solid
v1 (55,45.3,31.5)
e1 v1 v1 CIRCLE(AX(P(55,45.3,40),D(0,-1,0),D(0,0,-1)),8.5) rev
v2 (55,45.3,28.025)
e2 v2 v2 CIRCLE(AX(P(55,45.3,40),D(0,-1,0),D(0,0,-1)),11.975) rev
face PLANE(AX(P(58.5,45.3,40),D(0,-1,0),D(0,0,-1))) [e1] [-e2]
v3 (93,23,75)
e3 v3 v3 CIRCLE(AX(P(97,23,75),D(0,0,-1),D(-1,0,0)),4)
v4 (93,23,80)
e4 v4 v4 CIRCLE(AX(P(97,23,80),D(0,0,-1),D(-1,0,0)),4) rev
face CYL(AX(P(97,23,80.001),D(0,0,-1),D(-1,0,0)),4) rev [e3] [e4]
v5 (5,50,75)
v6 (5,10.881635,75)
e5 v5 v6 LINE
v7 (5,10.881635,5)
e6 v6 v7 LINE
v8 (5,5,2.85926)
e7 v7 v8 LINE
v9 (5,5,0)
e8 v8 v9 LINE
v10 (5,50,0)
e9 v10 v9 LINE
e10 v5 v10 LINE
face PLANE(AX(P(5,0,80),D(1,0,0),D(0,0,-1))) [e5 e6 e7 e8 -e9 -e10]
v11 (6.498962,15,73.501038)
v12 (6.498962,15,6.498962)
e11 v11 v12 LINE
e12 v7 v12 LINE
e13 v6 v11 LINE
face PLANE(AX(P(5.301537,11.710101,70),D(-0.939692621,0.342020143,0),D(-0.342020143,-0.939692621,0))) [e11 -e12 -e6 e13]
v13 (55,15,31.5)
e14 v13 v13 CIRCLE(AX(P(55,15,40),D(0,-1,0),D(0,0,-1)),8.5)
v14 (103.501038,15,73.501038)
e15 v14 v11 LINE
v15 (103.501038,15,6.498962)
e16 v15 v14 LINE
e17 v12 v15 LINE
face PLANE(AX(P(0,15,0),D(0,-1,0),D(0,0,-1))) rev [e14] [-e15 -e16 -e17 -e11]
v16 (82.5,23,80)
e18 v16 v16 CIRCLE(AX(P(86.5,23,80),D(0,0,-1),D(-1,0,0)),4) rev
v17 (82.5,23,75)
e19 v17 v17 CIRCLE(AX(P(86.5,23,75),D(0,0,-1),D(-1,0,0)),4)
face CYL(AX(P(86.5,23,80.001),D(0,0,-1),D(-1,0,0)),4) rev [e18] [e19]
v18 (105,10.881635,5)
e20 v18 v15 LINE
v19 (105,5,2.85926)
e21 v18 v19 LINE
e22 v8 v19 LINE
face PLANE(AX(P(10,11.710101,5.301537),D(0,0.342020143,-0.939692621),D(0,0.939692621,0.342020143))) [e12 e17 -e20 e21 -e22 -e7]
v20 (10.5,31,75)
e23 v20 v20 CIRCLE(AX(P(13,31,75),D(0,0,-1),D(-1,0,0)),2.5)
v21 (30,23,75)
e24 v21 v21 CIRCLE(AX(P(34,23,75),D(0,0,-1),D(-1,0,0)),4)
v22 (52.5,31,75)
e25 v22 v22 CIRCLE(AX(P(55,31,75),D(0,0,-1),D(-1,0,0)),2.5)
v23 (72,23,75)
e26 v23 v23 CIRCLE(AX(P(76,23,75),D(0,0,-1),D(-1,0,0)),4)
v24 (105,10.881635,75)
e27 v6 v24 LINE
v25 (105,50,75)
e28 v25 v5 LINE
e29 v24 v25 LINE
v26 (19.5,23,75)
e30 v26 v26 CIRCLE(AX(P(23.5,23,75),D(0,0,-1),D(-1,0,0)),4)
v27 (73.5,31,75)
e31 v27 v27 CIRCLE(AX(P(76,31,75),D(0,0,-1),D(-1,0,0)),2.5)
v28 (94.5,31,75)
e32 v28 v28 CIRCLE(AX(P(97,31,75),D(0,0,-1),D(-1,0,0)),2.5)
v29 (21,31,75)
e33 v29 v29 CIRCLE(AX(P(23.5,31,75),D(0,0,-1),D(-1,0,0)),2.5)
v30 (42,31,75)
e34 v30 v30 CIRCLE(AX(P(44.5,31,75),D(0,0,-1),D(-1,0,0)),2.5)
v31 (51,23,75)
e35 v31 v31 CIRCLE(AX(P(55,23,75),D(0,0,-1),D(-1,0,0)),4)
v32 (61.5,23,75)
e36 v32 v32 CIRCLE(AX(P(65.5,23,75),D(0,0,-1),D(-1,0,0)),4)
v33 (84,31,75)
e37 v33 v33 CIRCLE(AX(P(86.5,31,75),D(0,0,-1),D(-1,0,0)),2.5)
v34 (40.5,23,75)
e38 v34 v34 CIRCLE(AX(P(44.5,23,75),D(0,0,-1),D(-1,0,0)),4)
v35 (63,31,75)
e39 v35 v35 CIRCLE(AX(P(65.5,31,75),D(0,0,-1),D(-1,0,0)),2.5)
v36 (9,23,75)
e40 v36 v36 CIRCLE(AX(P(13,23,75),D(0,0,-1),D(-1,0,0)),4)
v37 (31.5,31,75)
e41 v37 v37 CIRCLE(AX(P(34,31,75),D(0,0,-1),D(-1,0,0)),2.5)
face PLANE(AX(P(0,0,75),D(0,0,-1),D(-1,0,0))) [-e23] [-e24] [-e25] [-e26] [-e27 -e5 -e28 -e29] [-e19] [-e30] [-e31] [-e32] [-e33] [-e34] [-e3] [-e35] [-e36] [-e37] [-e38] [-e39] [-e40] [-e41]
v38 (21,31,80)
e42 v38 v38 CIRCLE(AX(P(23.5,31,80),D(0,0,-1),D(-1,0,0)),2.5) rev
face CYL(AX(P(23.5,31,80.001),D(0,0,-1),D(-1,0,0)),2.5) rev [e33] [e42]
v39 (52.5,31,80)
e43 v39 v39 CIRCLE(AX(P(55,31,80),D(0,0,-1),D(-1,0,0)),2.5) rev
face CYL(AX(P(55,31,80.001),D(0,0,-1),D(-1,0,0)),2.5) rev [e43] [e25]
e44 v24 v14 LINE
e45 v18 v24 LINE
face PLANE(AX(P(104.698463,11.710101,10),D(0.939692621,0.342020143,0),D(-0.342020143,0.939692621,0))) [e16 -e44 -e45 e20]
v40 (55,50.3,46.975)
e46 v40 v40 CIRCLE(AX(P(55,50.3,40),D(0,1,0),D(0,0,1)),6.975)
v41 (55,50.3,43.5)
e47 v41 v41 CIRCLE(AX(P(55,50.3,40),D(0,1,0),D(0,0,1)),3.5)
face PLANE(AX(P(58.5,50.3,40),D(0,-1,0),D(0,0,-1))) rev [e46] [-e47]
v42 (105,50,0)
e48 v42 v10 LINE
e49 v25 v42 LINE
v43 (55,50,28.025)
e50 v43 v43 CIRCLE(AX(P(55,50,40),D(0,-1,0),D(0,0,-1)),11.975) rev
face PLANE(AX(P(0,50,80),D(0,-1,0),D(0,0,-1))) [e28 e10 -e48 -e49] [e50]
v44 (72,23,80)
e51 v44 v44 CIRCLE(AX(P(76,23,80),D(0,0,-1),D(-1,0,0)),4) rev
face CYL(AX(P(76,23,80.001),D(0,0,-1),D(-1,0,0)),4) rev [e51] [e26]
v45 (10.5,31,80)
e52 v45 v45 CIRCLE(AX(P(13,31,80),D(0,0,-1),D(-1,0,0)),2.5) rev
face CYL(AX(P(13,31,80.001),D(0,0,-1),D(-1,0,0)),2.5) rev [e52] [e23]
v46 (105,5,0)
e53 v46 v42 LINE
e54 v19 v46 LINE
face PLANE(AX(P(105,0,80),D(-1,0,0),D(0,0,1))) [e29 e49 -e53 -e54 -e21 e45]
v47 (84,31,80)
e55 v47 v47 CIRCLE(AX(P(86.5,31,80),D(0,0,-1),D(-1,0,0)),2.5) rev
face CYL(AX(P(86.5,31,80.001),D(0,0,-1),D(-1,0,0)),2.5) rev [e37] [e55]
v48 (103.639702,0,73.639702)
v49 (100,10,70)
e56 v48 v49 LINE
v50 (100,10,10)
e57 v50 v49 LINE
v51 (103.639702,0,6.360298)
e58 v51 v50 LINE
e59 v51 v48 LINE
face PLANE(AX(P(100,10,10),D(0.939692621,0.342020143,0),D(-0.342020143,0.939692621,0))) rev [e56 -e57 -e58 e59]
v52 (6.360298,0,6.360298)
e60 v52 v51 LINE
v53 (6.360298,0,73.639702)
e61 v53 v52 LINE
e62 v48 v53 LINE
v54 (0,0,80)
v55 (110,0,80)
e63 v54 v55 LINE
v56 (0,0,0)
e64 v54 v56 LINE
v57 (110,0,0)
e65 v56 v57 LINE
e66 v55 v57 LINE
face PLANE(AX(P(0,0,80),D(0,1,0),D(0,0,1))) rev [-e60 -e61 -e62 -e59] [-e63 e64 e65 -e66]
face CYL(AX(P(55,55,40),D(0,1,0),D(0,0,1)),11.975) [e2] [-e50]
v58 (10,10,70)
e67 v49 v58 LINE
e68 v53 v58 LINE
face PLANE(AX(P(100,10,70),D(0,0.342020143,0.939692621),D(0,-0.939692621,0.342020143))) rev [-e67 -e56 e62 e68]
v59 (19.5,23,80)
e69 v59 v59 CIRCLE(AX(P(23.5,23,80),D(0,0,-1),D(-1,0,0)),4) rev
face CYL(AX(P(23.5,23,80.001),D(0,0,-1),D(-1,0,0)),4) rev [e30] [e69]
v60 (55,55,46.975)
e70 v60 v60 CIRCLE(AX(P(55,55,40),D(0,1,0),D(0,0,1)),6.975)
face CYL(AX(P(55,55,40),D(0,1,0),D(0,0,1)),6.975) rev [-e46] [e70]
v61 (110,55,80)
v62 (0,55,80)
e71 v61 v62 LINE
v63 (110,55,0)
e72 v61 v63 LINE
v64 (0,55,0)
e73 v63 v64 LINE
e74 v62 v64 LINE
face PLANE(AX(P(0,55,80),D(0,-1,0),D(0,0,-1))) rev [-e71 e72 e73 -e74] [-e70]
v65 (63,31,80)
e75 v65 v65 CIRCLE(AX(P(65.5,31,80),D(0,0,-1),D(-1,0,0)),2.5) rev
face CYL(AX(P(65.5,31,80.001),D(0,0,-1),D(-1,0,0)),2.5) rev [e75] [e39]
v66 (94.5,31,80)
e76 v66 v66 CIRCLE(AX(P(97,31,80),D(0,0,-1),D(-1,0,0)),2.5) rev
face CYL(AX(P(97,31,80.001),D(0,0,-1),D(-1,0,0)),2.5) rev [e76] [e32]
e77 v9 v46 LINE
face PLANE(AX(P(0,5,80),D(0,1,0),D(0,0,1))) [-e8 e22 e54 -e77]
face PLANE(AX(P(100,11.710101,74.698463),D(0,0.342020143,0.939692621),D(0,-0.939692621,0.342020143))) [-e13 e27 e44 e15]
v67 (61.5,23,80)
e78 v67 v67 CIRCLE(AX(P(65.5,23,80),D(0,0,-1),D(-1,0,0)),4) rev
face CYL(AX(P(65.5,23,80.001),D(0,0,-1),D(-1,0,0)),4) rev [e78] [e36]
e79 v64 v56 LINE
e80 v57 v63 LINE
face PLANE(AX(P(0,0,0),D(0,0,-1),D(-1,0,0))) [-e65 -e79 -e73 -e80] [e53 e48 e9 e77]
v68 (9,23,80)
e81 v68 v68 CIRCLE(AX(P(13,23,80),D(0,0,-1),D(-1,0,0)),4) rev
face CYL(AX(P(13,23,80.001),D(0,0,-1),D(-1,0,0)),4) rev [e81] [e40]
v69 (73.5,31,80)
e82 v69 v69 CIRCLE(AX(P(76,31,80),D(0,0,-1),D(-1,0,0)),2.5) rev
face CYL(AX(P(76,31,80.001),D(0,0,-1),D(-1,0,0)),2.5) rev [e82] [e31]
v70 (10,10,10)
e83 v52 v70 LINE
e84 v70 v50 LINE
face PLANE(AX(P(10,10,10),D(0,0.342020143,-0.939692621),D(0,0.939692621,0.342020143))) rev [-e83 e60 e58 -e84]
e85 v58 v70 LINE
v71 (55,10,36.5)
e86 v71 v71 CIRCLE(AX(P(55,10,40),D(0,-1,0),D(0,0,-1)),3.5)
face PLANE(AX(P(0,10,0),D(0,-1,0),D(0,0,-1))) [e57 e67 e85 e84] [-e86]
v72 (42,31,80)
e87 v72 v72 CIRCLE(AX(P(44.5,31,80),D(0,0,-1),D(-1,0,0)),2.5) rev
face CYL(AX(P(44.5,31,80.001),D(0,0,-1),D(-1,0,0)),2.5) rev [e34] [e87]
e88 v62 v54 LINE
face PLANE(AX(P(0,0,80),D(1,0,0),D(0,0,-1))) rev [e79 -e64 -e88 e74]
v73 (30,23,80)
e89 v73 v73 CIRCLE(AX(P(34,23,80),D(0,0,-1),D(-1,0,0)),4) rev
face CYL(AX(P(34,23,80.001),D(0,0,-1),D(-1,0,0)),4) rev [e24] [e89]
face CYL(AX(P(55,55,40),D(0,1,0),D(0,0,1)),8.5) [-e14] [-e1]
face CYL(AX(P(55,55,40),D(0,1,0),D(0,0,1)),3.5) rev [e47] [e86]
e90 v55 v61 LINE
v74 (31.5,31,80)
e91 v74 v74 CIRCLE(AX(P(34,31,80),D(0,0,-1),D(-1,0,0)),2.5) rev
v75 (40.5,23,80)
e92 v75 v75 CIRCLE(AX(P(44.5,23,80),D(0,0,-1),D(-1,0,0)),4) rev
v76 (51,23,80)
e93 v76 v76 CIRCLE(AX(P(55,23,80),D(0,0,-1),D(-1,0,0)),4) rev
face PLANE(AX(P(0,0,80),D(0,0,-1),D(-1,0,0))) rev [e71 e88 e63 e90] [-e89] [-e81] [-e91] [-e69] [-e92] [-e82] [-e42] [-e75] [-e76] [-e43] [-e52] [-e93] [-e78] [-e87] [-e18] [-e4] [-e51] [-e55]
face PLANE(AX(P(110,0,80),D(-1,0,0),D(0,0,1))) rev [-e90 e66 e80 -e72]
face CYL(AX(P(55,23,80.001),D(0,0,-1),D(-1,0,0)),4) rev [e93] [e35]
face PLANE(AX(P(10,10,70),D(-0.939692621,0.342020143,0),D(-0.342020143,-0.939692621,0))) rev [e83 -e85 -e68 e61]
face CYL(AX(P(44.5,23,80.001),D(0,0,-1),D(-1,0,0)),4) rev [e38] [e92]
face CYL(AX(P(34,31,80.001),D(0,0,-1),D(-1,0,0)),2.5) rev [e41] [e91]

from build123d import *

# Parameters (mm, degrees)
SKETCH2_W                                        = 110
SKETCH2_H                                        = 55
BOSS_EXTRUDE1_DEPTH                              = 80
SKETCH4_W                                        = 90
SKETCH4_H                                        = 60
CUT_EXTRUDE2_DEPTH                               = 10
CUT_EXTRUDE2_DRAFT                               = -20
CBORE_FOR_M6_HEX_HEAD_MACHINE_SCREW1_D           = 7
CBORE_FOR_M6_HEX_HEAD_MACHINE_SCREW1_CBORE_D     = 13.95
CBORE_FOR_M6_HEX_HEAD_MACHINE_SCREW1_CBORE_DEPTH = 4.7
SHELL4_START                                     = 15
SHELL4_OUTLINE_W                                 = 100
SHELL4_OUTLINE_H                                 = 75
SHELL4_OUTLINE_R                                 = 11.975
SHELL4_DEPTH                                     = 35
SHELL4_2_OUTLINE_R                               = 11.975
SHELL4_2_OUTLINE_R_2                             = 8.5
SHELL4_2_DEPTH                                   = 30.3
SHELL4_3_OUTLINE_W                               = 100
SHELL4_3_OUTLINE_H                               = 10
SHELL4_3_DEPTH                                   = 2.859259966
SHELL4_4_DEPTH                                   = 75
SHELL4_START_2                                   = 5
SHELL4_5_DEPTH                                   = 100
CUT_EXTRUDE4_REACH                               = 146.049
SKETCH8_R                                        = 2.5
SKETCH8_R_2                                      = 4


with BuildPart() as part:
    # Sketch2 → Boss-Extrude1 (new body)
    with BuildSketch(Plane.XY):
        with Locations((55, 27.5)):
            Rectangle(SKETCH2_W, SKETCH2_H)
    extrude(amount=BOSS_EXTRUDE1_DEPTH)


with BuildPart() as cut_extrude2_tool:
    # Sketch4 → Cut-Extrude2 (with draft: the straight prism first)
    with BuildSketch(Plane(origin=(0, 10, 0), x_dir=(-1, 0, 0), z_dir=(0, -1, 0))):
        with Locations((-55, -40)):
            Rectangle(SKETCH4_W, SKETCH4_H)
    extrude(amount=CUT_EXTRUDE2_DEPTH)
    # Cut-Extrude2: the draft: its side faces are tilted about the plane it starts from
    cut_extrude2_sides = [cut_extrude2_tool.faces().sort_by_distance(p)[0] for p in [
        (55, 5, 70),
        (10, 5, 40),
        (55, 5, 10),
        (100, 5, 40),
    ]]
    draft(cut_extrude2_sides, Plane(origin=(0, 10, 0), x_dir=(-1, 0, 0), z_dir=(0, -1, 0)), CUT_EXTRUDE2_DRAFT)


with BuildPart() as part_1:
    add(part.part)

    # Cut-Extrude2: cut by cut_extrude2_tool
    add(cut_extrude2_tool.part, mode=Mode.SUBTRACT)

    # CBORE for M6 Hex Head Machine Screw1 (through all)
    with Locations(Plane(origin=(0, 55, 0), x_dir=(1, 0, 0), z_dir=(0, 1, 0))):
        with Locations((55, -40)):
            CounterBoreHole(CBORE_FOR_M6_HEX_HEAD_MACHINE_SCREW1_D / 2, CBORE_FOR_M6_HEX_HEAD_MACHINE_SCREW1_CBORE_D / 2, CBORE_FOR_M6_HEX_HEAD_MACHINE_SCREW1_CBORE_DEPTH)

    # Shell4: read off the stored shape, not the designer's step
    # Shell4 outline → Shell4 (cut)
    with BuildSketch(Plane(origin=(0, 0, 0), x_dir=(1, 0, 0), z_dir=(0, 1, 0)).offset(SHELL4_START)):
        with Locations((55, -37.5)):
            Rectangle(SHELL4_OUTLINE_W, SHELL4_OUTLINE_H)
        with Locations((55, -40)):
            Circle(SHELL4_OUTLINE_R, mode=Mode.SUBTRACT)
    extrude(amount=SHELL4_DEPTH, mode=Mode.SUBTRACT)

    # Shell4 2 outline → Shell4 2 (cut)
    with BuildSketch(Plane(origin=(0, 0, 0), x_dir=(1, 0, 0), z_dir=(0, 1, 0)).offset(SHELL4_START)):
        with Locations((55, -40)):
            Circle(SHELL4_2_OUTLINE_R)
        with Locations((55, -40)):
            Circle(SHELL4_2_OUTLINE_R_2, mode=Mode.SUBTRACT)
    extrude(amount=SHELL4_2_DEPTH, mode=Mode.SUBTRACT)

    # Shell4 3 outline → Shell4 3 (cut)
    with BuildSketch(Plane.XY):
        with Locations((55, 10)):
            Rectangle(SHELL4_3_OUTLINE_W, SHELL4_3_OUTLINE_H)
    extrude(amount=SHELL4_3_DEPTH, mode=Mode.SUBTRACT)

    # Shell4 4 outline → Shell4 4 (cut)
    with BuildSketch(Plane.XY):
        Polygon((103.501037691, 15), (105, 10.881634904), (105, 15), align=None)
        Polygon((5, 15), (5, 10.881634904), (6.498962309, 15), align=None)
    extrude(amount=SHELL4_4_DEPTH, mode=Mode.SUBTRACT)

    # Shell4 5 outline → Shell4 5 (cut)
    with BuildSketch(Plane.YZ.offset(SHELL4_START_2)):
        Polygon((15, 2.859259966), (15, 6.498962309), (5, 2.859259966), align=None)
        Polygon((15, 75), (10.881634904, 75), (15, 73.501037691), align=None)
    extrude(amount=SHELL4_5_DEPTH, mode=Mode.SUBTRACT)

    # Sketch8 → Cut-Extrude4 (cut, up to next)
    with BuildSketch(Plane(origin=(0, 0, 75), x_dir=(-1, 0, 0), z_dir=(0, 0, -1)), mode=Mode.PRIVATE) as cut_extrude4_sk1:
        with Locations((-97, 31)):
            Circle(SKETCH8_R)
    cut_extrude4_tool1 = extrude(cut_extrude4_sk1.sketch, amount=-CUT_EXTRUDE4_REACH, mode=Mode.PRIVATE) & part_1.part
    # Sketch8 → Cut-Extrude4 (cut, up to next)
    with BuildSketch(Plane(origin=(0, 0, 75), x_dir=(-1, 0, 0), z_dir=(0, 0, -1)), mode=Mode.PRIVATE) as cut_extrude4_sk2:
        with Locations((-97, 23)):
            Circle(SKETCH8_R_2)
    cut_extrude4_tool2 = extrude(cut_extrude4_sk2.sketch, amount=-CUT_EXTRUDE4_REACH, mode=Mode.PRIVATE) & part_1.part
    # Sketch8 → Cut-Extrude4 (cut, up to next)
    with BuildSketch(Plane(origin=(0, 0, 75), x_dir=(-1, 0, 0), z_dir=(0, 0, -1)), mode=Mode.PRIVATE) as cut_extrude4_sk3:
        with Locations((-86.5, 31)):
            Circle(SKETCH8_R)
    cut_extrude4_tool3 = extrude(cut_extrude4_sk3.sketch, amount=-CUT_EXTRUDE4_REACH, mode=Mode.PRIVATE) & part_1.part
    # Sketch8 → Cut-Extrude4 (cut, up to next)
    with BuildSketch(Plane(origin=(0, 0, 75), x_dir=(-1, 0, 0), z_dir=(0, 0, -1)), mode=Mode.PRIVATE) as cut_extrude4_sk4:
        with Locations((-86.5, 23)):
            Circle(SKETCH8_R_2)
    cut_extrude4_tool4 = extrude(cut_extrude4_sk4.sketch, amount=-CUT_EXTRUDE4_REACH, mode=Mode.PRIVATE) & part_1.part
    # Sketch8 → Cut-Extrude4 (cut, up to next)
    with BuildSketch(Plane(origin=(0, 0, 75), x_dir=(-1, 0, 0), z_dir=(0, 0, -1)), mode=Mode.PRIVATE) as cut_extrude4_sk5:
        with Locations((-76, 31)):
            Circle(SKETCH8_R)
    cut_extrude4_tool5 = extrude(cut_extrude4_sk5.sketch, amount=-CUT_EXTRUDE4_REACH, mode=Mode.PRIVATE) & part_1.part
    # Sketch8 → Cut-Extrude4 (cut, up to next)
    with BuildSketch(Plane(origin=(0, 0, 75), x_dir=(-1, 0, 0), z_dir=(0, 0, -1)), mode=Mode.PRIVATE) as cut_extrude4_sk6:
        with Locations((-76, 23)):
            Circle(SKETCH8_R_2)
    cut_extrude4_tool6 = extrude(cut_extrude4_sk6.sketch, amount=-CUT_EXTRUDE4_REACH, mode=Mode.PRIVATE) & part_1.part
    # Sketch8 → Cut-Extrude4 (cut, up to next)
    with BuildSketch(Plane(origin=(0, 0, 75), x_dir=(-1, 0, 0), z_dir=(0, 0, -1)), mode=Mode.PRIVATE) as cut_extrude4_sk7:
        with Locations((-65.5, 31)):
            Circle(SKETCH8_R)
    cut_extrude4_tool7 = extrude(cut_extrude4_sk7.sketch, amount=-CUT_EXTRUDE4_REACH, mode=Mode.PRIVATE) & part_1.part
    # Sketch8 → Cut-Extrude4 (cut, up to next)
    with BuildSketch(Plane(origin=(0, 0, 75), x_dir=(-1, 0, 0), z_dir=(0, 0, -1)), mode=Mode.PRIVATE) as cut_extrude4_sk8:
        with Locations((-65.5, 23)):
            Circle(SKETCH8_R_2)
    cut_extrude4_tool8 = extrude(cut_extrude4_sk8.sketch, amount=-CUT_EXTRUDE4_REACH, mode=Mode.PRIVATE) & part_1.part
    # Sketch8 → Cut-Extrude4 (cut, up to next)
    with BuildSketch(Plane(origin=(0, 0, 75), x_dir=(-1, 0, 0), z_dir=(0, 0, -1)), mode=Mode.PRIVATE) as cut_extrude4_sk9:
        with Locations((-55, 31)):
            Circle(SKETCH8_R)
    cut_extrude4_tool9 = extrude(cut_extrude4_sk9.sketch, amount=-CUT_EXTRUDE4_REACH, mode=Mode.PRIVATE) & part_1.part
    # Sketch8 → Cut-Extrude4 (cut, up to next)
    with BuildSketch(Plane(origin=(0, 0, 75), x_dir=(-1, 0, 0), z_dir=(0, 0, -1)), mode=Mode.PRIVATE) as cut_extrude4_sk10:
        with Locations((-55, 23)):
            Circle(SKETCH8_R_2)
    cut_extrude4_tool10 = extrude(cut_extrude4_sk10.sketch, amount=-CUT_EXTRUDE4_REACH, mode=Mode.PRIVATE) & part_1.part
    # Sketch8 → Cut-Extrude4 (cut, up to next)
    with BuildSketch(Plane(origin=(0, 0, 75), x_dir=(-1, 0, 0), z_dir=(0, 0, -1)), mode=Mode.PRIVATE) as cut_extrude4_sk11:
        with Locations((-44.5, 31)):
            Circle(SKETCH8_R)
    cut_extrude4_tool11 = extrude(cut_extrude4_sk11.sketch, amount=-CUT_EXTRUDE4_REACH, mode=Mode.PRIVATE) & part_1.part
    # Sketch8 → Cut-Extrude4 (cut, up to next)
    with BuildSketch(Plane(origin=(0, 0, 75), x_dir=(-1, 0, 0), z_dir=(0, 0, -1)), mode=Mode.PRIVATE) as cut_extrude4_sk12:
        with Locations((-44.5, 23)):
            Circle(SKETCH8_R_2)
    cut_extrude4_tool12 = extrude(cut_extrude4_sk12.sketch, amount=-CUT_EXTRUDE4_REACH, mode=Mode.PRIVATE) & part_1.part
    # Sketch8 → Cut-Extrude4 (cut, up to next)
    with BuildSketch(Plane(origin=(0, 0, 75), x_dir=(-1, 0, 0), z_dir=(0, 0, -1)), mode=Mode.PRIVATE) as cut_extrude4_sk13:
        with Locations((-34, 31)):
            Circle(SKETCH8_R)
    cut_extrude4_tool13 = extrude(cut_extrude4_sk13.sketch, amount=-CUT_EXTRUDE4_REACH, mode=Mode.PRIVATE) & part_1.part
    # Sketch8 → Cut-Extrude4 (cut, up to next)
    with BuildSketch(Plane(origin=(0, 0, 75), x_dir=(-1, 0, 0), z_dir=(0, 0, -1)), mode=Mode.PRIVATE) as cut_extrude4_sk14:
        with Locations((-34, 23)):
            Circle(SKETCH8_R_2)
    cut_extrude4_tool14 = extrude(cut_extrude4_sk14.sketch, amount=-CUT_EXTRUDE4_REACH, mode=Mode.PRIVATE) & part_1.part
    # Sketch8 → Cut-Extrude4 (cut, up to next)
    with BuildSketch(Plane(origin=(0, 0, 75), x_dir=(-1, 0, 0), z_dir=(0, 0, -1)), mode=Mode.PRIVATE) as cut_extrude4_sk15:
        with Locations((-23.5, 31)):
            Circle(SKETCH8_R)
    cut_extrude4_tool15 = extrude(cut_extrude4_sk15.sketch, amount=-CUT_EXTRUDE4_REACH, mode=Mode.PRIVATE) & part_1.part
    # Sketch8 → Cut-Extrude4 (cut, up to next)
    with BuildSketch(Plane(origin=(0, 0, 75), x_dir=(-1, 0, 0), z_dir=(0, 0, -1)), mode=Mode.PRIVATE) as cut_extrude4_sk16:
        with Locations((-23.5, 23)):
            Circle(SKETCH8_R_2)
    cut_extrude4_tool16 = extrude(cut_extrude4_sk16.sketch, amount=-CUT_EXTRUDE4_REACH, mode=Mode.PRIVATE) & part_1.part
    # Sketch8 → Cut-Extrude4 (cut, up to next)
    with BuildSketch(Plane(origin=(0, 0, 75), x_dir=(-1, 0, 0), z_dir=(0, 0, -1)), mode=Mode.PRIVATE) as cut_extrude4_sk17:
        with Locations((-13, 31)):
            Circle(SKETCH8_R)
    cut_extrude4_tool17 = extrude(cut_extrude4_sk17.sketch, amount=-CUT_EXTRUDE4_REACH, mode=Mode.PRIVATE) & part_1.part
    # Sketch8 → Cut-Extrude4 (cut, up to next)
    with BuildSketch(Plane(origin=(0, 0, 75), x_dir=(-1, 0, 0), z_dir=(0, 0, -1)), mode=Mode.PRIVATE) as cut_extrude4_sk18:
        with Locations((-13, 23)):
            Circle(SKETCH8_R_2)
    cut_extrude4_tool18 = extrude(cut_extrude4_sk18.sketch, amount=-CUT_EXTRUDE4_REACH, mode=Mode.PRIVATE) & part_1.part
    add(cut_extrude4_tool1.solids().sort_by_distance((97, 31, 75))[0], mode=Mode.SUBTRACT)
    add(cut_extrude4_tool2.solids().sort_by_distance((97, 23, 75))[0], mode=Mode.SUBTRACT)
    add(cut_extrude4_tool3.solids().sort_by_distance((86.5, 31, 75))[0], mode=Mode.SUBTRACT)
    add(cut_extrude4_tool4.solids().sort_by_distance((86.5, 23, 75))[0], mode=Mode.SUBTRACT)
    add(cut_extrude4_tool5.solids().sort_by_distance((76, 31, 75))[0], mode=Mode.SUBTRACT)
    add(cut_extrude4_tool6.solids().sort_by_distance((76, 23, 75))[0], mode=Mode.SUBTRACT)
    add(cut_extrude4_tool7.solids().sort_by_distance((65.5, 31, 75))[0], mode=Mode.SUBTRACT)
    add(cut_extrude4_tool8.solids().sort_by_distance((65.5, 23, 75))[0], mode=Mode.SUBTRACT)
    add(cut_extrude4_tool9.solids().sort_by_distance((55, 31, 75))[0], mode=Mode.SUBTRACT)
    add(cut_extrude4_tool10.solids().sort_by_distance((55, 23, 75))[0], mode=Mode.SUBTRACT)
    add(cut_extrude4_tool11.solids().sort_by_distance((44.5, 31, 75))[0], mode=Mode.SUBTRACT)
    add(cut_extrude4_tool12.solids().sort_by_distance((44.5, 23, 75))[0], mode=Mode.SUBTRACT)
    add(cut_extrude4_tool13.solids().sort_by_distance((34, 31, 75))[0], mode=Mode.SUBTRACT)
    add(cut_extrude4_tool14.solids().sort_by_distance((34, 23, 75))[0], mode=Mode.SUBTRACT)
    add(cut_extrude4_tool15.solids().sort_by_distance((23.5, 31, 75))[0], mode=Mode.SUBTRACT)
    add(cut_extrude4_tool16.solids().sort_by_distance((23.5, 23, 75))[0], mode=Mode.SUBTRACT)
    add(cut_extrude4_tool17.solids().sort_by_distance((13, 31, 75))[0], mode=Mode.SUBTRACT)
    add(cut_extrude4_tool18.solids().sort_by_distance((13, 23, 75))[0], mode=Mode.SUBTRACT)


solid = part_1.part
